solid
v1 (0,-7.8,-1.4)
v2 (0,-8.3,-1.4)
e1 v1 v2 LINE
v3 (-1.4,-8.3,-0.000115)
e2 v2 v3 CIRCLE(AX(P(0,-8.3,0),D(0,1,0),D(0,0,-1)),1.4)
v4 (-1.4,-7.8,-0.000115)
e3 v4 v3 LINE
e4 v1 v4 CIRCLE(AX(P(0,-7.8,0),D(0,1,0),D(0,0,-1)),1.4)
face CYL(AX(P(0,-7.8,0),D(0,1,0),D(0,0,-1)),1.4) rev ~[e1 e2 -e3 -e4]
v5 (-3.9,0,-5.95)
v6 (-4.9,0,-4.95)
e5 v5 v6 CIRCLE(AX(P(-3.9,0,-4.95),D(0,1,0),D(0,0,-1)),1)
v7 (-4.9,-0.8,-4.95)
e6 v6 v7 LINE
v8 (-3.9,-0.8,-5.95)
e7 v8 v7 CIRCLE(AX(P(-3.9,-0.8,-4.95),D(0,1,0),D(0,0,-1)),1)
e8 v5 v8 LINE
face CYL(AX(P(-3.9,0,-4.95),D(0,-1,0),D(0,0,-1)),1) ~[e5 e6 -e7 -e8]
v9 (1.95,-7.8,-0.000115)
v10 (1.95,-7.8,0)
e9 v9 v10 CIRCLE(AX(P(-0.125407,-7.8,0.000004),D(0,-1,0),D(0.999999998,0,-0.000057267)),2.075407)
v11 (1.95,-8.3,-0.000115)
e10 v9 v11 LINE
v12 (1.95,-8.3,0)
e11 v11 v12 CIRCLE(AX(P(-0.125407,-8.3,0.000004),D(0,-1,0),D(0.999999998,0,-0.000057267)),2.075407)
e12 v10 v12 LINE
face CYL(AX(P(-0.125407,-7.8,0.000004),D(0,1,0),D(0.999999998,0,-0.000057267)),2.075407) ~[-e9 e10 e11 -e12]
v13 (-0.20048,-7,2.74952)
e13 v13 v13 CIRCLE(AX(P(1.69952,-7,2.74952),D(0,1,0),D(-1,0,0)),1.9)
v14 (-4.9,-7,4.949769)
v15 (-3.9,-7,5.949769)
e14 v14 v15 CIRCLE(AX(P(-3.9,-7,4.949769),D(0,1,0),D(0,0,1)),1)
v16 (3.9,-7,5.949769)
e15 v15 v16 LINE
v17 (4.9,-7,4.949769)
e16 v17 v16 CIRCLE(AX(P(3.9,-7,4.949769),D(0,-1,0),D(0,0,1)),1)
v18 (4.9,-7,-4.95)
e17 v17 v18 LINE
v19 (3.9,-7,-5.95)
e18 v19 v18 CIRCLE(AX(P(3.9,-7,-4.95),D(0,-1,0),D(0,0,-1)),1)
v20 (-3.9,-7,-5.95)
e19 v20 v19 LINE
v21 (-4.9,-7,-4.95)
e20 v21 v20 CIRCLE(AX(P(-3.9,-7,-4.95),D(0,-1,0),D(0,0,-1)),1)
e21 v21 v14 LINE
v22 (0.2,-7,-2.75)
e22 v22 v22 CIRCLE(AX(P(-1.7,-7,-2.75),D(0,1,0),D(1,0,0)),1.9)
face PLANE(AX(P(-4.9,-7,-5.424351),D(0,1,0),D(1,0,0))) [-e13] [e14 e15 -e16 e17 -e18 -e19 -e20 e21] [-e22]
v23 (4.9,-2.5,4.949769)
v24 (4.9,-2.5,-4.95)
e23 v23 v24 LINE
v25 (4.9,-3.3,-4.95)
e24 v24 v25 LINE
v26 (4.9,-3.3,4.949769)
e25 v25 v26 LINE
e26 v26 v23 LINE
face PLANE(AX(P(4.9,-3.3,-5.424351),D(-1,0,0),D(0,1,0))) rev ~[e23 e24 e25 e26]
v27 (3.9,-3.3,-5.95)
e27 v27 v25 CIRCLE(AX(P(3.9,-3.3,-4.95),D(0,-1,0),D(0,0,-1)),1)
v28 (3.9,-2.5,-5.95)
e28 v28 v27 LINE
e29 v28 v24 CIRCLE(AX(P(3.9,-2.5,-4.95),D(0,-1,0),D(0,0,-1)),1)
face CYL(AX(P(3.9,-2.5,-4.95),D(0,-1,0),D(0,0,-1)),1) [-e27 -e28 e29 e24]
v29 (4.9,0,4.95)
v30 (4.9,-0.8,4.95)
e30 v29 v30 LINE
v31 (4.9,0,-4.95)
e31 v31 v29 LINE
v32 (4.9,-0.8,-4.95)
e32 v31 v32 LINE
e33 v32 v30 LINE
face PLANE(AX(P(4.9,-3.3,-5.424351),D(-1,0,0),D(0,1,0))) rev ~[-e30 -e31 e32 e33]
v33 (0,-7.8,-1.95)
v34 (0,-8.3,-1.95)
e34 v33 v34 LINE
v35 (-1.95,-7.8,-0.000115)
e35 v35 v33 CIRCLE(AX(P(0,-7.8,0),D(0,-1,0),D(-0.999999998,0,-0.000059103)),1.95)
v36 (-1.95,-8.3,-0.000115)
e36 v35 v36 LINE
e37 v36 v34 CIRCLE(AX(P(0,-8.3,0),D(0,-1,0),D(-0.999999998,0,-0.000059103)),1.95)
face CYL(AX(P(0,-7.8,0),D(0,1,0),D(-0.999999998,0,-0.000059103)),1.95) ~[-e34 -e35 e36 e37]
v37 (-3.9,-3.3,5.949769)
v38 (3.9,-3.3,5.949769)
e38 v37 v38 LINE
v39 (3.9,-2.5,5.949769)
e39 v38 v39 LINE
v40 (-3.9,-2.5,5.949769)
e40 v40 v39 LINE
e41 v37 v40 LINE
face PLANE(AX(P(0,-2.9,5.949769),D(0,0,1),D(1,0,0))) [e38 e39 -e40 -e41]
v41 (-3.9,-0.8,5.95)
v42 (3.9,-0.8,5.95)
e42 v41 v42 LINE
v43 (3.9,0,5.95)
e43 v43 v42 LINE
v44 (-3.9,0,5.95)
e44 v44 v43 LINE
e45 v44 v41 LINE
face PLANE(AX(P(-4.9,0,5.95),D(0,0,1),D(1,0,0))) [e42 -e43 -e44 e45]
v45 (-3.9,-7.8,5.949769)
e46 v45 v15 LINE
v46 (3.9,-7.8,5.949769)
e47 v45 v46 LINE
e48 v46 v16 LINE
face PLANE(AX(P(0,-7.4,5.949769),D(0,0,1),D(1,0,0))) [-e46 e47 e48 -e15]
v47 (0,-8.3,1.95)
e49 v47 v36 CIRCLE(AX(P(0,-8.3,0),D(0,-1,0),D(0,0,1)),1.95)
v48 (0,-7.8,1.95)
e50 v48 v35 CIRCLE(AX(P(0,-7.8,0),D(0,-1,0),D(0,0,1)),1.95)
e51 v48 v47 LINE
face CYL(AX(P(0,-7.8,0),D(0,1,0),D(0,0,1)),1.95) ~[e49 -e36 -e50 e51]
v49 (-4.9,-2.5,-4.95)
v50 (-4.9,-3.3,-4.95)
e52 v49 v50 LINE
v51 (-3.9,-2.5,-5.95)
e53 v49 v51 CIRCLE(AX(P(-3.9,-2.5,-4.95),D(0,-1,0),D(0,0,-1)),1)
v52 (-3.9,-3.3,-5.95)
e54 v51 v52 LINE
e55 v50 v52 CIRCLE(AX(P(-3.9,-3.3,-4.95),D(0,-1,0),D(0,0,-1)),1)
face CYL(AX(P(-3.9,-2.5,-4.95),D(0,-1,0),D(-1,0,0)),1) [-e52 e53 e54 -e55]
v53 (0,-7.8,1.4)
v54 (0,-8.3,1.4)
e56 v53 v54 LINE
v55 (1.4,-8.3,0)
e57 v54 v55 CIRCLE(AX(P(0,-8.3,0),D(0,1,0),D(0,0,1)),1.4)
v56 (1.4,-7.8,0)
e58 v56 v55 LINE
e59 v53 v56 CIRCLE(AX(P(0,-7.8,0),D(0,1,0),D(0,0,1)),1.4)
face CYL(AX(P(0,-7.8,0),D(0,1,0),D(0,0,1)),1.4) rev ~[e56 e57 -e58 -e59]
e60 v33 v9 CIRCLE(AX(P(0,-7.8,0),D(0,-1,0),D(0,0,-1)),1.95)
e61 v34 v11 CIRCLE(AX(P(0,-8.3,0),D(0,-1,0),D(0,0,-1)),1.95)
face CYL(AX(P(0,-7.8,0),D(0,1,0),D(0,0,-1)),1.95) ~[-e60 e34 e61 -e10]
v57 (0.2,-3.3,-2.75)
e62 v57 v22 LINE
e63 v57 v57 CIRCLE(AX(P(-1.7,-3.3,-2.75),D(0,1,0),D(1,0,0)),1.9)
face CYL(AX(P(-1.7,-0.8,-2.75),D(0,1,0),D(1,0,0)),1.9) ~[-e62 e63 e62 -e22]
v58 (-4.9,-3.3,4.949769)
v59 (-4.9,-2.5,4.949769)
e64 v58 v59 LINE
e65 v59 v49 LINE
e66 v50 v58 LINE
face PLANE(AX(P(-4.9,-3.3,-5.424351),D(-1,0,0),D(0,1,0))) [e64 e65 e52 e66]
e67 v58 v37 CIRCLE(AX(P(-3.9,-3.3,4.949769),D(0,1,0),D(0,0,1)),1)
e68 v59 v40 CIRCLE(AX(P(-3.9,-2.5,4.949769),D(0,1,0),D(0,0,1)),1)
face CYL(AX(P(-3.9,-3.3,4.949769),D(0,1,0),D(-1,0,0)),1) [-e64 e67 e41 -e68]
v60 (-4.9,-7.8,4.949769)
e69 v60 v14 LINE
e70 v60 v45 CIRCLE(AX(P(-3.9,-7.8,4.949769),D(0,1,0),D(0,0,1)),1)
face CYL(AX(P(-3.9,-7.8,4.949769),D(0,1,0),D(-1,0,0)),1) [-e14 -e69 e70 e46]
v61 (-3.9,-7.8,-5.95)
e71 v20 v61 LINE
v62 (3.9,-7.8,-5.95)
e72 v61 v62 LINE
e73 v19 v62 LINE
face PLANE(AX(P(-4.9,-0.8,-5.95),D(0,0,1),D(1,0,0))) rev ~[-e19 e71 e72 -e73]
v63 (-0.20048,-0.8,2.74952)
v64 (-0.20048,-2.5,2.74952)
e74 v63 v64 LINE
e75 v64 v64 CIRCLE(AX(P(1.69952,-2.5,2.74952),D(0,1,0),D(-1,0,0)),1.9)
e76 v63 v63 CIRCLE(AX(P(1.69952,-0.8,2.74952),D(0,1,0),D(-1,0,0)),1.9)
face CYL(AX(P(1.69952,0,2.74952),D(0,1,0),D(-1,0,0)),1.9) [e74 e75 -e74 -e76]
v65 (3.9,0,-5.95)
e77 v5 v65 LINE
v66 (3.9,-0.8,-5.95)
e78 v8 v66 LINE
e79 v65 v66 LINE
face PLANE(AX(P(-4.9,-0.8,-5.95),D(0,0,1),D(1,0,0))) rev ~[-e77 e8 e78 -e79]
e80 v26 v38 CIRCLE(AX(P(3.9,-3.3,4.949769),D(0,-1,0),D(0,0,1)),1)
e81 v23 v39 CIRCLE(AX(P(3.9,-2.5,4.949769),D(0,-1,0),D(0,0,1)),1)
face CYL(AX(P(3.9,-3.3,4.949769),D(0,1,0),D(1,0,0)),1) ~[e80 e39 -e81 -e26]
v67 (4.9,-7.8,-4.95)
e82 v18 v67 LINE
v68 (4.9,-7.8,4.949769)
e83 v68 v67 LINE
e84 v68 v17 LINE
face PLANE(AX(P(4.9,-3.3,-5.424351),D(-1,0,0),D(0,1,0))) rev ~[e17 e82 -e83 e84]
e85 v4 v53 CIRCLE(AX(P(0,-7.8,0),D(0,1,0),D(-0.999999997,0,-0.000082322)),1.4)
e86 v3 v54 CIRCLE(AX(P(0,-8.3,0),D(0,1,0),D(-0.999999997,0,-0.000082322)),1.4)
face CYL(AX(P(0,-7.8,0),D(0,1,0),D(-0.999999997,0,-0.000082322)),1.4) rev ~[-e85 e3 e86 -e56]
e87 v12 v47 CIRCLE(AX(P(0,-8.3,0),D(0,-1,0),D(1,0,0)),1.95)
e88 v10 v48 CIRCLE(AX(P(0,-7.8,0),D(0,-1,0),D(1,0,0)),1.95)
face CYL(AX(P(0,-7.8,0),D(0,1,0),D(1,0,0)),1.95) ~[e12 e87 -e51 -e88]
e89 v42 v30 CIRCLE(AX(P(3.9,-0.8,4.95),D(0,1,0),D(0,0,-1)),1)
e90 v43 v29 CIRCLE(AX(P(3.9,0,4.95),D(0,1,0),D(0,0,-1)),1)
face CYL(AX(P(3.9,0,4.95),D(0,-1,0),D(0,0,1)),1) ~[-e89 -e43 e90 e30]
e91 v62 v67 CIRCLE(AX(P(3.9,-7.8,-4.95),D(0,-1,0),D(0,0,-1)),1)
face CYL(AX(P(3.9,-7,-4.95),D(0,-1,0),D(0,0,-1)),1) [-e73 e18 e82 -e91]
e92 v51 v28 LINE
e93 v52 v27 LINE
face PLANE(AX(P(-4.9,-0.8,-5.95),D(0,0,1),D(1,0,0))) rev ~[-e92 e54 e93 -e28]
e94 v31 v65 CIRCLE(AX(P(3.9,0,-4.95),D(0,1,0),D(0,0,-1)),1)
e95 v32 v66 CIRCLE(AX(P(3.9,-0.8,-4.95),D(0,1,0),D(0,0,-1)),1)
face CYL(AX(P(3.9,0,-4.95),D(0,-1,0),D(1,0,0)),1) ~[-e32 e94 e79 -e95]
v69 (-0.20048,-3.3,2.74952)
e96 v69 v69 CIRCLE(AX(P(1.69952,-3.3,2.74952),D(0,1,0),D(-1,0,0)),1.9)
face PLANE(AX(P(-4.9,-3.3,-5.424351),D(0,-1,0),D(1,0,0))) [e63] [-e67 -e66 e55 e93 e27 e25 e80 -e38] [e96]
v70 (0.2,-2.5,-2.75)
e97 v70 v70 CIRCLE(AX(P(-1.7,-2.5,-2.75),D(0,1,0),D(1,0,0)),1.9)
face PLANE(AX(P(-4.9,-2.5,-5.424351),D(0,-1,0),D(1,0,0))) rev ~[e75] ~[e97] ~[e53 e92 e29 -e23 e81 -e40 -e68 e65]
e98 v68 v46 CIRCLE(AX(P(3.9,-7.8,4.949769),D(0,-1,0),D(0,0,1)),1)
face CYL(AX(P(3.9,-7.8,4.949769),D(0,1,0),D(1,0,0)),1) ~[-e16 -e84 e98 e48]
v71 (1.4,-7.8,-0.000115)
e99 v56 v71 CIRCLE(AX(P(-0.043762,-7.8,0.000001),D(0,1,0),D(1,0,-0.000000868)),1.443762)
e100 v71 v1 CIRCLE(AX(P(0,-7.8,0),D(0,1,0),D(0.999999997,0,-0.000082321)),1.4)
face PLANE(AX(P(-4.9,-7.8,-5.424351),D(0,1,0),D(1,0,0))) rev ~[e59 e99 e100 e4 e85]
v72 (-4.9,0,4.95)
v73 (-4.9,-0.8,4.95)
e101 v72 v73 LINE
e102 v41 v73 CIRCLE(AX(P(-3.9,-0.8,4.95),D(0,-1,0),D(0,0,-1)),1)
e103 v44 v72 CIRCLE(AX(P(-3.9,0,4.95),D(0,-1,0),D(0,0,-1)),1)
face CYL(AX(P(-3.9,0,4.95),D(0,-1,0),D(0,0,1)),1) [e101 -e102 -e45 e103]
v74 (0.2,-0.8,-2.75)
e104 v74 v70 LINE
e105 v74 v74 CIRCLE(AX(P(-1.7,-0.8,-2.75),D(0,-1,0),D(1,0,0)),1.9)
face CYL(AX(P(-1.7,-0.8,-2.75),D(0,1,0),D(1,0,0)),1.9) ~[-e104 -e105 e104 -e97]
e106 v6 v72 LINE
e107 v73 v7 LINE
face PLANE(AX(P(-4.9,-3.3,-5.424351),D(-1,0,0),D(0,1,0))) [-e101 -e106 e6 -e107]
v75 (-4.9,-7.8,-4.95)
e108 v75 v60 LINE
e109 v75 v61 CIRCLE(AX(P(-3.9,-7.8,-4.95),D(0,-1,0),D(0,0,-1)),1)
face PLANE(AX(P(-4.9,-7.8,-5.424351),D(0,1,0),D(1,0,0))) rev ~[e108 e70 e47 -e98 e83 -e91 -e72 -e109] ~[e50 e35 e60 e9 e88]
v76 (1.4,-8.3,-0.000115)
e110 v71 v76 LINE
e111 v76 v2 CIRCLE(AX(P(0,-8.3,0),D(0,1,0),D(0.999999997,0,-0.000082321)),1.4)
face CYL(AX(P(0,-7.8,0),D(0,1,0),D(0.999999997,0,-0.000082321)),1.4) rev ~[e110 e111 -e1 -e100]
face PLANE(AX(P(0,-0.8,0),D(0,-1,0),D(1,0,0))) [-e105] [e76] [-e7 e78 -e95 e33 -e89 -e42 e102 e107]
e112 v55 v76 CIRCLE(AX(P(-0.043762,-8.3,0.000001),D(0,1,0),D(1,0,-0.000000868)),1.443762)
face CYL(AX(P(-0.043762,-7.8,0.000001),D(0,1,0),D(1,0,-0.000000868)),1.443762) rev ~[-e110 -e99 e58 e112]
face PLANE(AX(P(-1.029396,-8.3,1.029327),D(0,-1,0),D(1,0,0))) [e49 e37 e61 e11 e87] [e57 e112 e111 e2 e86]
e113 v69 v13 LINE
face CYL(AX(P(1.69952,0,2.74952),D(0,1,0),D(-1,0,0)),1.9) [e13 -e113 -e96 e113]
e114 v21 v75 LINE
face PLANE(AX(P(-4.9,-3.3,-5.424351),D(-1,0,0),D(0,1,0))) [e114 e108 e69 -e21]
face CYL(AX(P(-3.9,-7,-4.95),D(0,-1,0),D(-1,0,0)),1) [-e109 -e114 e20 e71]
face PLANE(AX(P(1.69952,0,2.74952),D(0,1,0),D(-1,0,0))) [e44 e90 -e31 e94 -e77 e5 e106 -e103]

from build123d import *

# Parameters (mm, degrees)
F0_W      = 9.8
F0_H      = 11.9
F1_DEPTH  = 0.8
F2_R      = 1.9
F4_DEPTH  = 6.9
F3_R      = 1.9
F5_DEPTH  = 7.7
F6_W      = 9.8
F6_H      = 0.5256494999
F7_DEPTH  = 25.4
F8_W      = 9.8
F8_H      = 0.8
F9_DEPTH  = 11.37412
F10_DEPTH = 25.4
F11_R     = 1
F13_DEPTH = 0.5


with BuildPart() as f1:
    # F0 (on Front) → F1 (new body)
    with BuildSketch(Plane.XZ):
        Rectangle(F0_W, F0_H)
    extrude(amount=F1_DEPTH)

    # F2 (on face) → F4 (join)
    with BuildSketch(Plane.XZ.offset(0.8)):
        with Locations((-1.7, -2.75)):
            Circle(F2_R)
    extrude(amount=F4_DEPTH)

    # F3 (on face) → F5 (join)
    with BuildSketch(Plane(origin=(0, 0, 0), x_dir=(-1, 0, 0), z_dir=(0, 1, 0))):
        with Locations((-1.69952, 2.74952)):
            Circle(F3_R)
    extrude(amount=-F5_DEPTH)

    # F6 (on face) → F7 (join)
    with BuildSketch(Plane.XZ.offset(0.8)):
        with Locations((0, -5.6871752501)):
            Rectangle(F6_W, F6_H)
    extrude(amount=F7_DEPTH)

    # F8 (on face) → F9 (join)
    with BuildSketch(Plane.XY.offset(-5.4243505001)):
        with Locations((0, -2.9)):
            Rectangle(F8_W, F8_H)
        with Locations((0, -7.4)):
            Rectangle(F8_W, F8_H)
    extrude(amount=F9_DEPTH)

    # F10 (cut): faces of the model
    f10_faces = [f1.faces().sort_by_distance(p)[0] for p in [
        (0, -17, -5.4243505001),
        (0, -5.15, -5.4243505001),
        (0, -1.65, -5.4243505001),
    ]]
    extrude(f10_faces, amount=-F10_DEPTH, mode=Mode.SUBTRACT)

    # F11
    f11_edges = [f1.edges().sort_by_distance(p)[0] for p in [
        (-4.9, -7.4, 5.949769),
        (-4.9, -2.9, 5.949769),
        (-4.9, -0.4, 5.95),
        (-4.9, -0.4, -5.95),
        (-4.9, -2.9, -5.95),
        (-4.9, -7.4, -5.95),
        (4.9, -7.4, 5.949769),
        (4.9, -2.9, 5.949769),
        (4.9, -0.4, 5.95),
        (4.9, -0.4, -5.95),
        (4.9, -7.4, -5.95),
        (4.9, -2.9, -5.95),
    ]]
    fillet(f11_edges, radius=F11_R)

    # F12 (on face) → F13 (join)
    with BuildSketch(Plane.XZ.offset(7.8)):
        with BuildLine():
            ThreePointArc((0, 1.95), (-1.3788989698, 1.3788174757), (-1.9499999966, -0.0001152501))
            Line((-1.9499999966, -0.0001152501), (-1.3999999953, -0.0001152501))
            ThreePointArc((-1.3999999953, -0.0001152501), (-0.9899902399, 0.9899087458), (0, 1.4))
            Line((0, 1.4), (0, 1.95))
        make_face()
        with BuildLine():
            Line((-1.3999999953, -0.0001152501), (-1.9499999966, -0.0001152501))
            ThreePointArc((-1.9499999966, -0.0001152501), (-1.3788174757, -1.3788989698), (0, -1.95))
            Line((0, -1.95), (0, -1.4))
            ThreePointArc((0, -1.4), (-0.9899087458, -0.9899902399), (-1.3999999953, -0.0001152501))
        make_face()
        with BuildLine():
            ThreePointArc((1.95, 0), (1.3788582233, 1.3788582233), (0, 1.95))
            Line((0, 1.95), (0, 1.4))
            ThreePointArc((0, 1.4), (0.9899494937, 0.9899494937), (1.4, 0))
            ThreePointArc((1.4, 0), (1.3999999988, -5.7625e-05), (1.3999999953, -0.0001152501))
            Line((1.3999999953, -0.0001152501), (1.9499999966, -0.0001152501))
            ThreePointArc((1.9499999966, -0.0001152501), (1.9499999991, -5.7625e-05), (1.95, 0))
        make_face()
        with BuildLine():
            Line((0, -1.4), (0, -1.95))
            ThreePointArc((0, -1.95), (1.3788174757, -1.3788989698), (1.9499999966, -0.0001152501))
            Line((1.9499999966, -0.0001152501), (1.3999999953, -0.0001152501))
            ThreePointArc((1.3999999953, -0.0001152501), (0.9899087458, -0.9899902399), (0, -1.4))
        make_face()
    extrude(amount=F13_DEPTH)


solid = f1.part
